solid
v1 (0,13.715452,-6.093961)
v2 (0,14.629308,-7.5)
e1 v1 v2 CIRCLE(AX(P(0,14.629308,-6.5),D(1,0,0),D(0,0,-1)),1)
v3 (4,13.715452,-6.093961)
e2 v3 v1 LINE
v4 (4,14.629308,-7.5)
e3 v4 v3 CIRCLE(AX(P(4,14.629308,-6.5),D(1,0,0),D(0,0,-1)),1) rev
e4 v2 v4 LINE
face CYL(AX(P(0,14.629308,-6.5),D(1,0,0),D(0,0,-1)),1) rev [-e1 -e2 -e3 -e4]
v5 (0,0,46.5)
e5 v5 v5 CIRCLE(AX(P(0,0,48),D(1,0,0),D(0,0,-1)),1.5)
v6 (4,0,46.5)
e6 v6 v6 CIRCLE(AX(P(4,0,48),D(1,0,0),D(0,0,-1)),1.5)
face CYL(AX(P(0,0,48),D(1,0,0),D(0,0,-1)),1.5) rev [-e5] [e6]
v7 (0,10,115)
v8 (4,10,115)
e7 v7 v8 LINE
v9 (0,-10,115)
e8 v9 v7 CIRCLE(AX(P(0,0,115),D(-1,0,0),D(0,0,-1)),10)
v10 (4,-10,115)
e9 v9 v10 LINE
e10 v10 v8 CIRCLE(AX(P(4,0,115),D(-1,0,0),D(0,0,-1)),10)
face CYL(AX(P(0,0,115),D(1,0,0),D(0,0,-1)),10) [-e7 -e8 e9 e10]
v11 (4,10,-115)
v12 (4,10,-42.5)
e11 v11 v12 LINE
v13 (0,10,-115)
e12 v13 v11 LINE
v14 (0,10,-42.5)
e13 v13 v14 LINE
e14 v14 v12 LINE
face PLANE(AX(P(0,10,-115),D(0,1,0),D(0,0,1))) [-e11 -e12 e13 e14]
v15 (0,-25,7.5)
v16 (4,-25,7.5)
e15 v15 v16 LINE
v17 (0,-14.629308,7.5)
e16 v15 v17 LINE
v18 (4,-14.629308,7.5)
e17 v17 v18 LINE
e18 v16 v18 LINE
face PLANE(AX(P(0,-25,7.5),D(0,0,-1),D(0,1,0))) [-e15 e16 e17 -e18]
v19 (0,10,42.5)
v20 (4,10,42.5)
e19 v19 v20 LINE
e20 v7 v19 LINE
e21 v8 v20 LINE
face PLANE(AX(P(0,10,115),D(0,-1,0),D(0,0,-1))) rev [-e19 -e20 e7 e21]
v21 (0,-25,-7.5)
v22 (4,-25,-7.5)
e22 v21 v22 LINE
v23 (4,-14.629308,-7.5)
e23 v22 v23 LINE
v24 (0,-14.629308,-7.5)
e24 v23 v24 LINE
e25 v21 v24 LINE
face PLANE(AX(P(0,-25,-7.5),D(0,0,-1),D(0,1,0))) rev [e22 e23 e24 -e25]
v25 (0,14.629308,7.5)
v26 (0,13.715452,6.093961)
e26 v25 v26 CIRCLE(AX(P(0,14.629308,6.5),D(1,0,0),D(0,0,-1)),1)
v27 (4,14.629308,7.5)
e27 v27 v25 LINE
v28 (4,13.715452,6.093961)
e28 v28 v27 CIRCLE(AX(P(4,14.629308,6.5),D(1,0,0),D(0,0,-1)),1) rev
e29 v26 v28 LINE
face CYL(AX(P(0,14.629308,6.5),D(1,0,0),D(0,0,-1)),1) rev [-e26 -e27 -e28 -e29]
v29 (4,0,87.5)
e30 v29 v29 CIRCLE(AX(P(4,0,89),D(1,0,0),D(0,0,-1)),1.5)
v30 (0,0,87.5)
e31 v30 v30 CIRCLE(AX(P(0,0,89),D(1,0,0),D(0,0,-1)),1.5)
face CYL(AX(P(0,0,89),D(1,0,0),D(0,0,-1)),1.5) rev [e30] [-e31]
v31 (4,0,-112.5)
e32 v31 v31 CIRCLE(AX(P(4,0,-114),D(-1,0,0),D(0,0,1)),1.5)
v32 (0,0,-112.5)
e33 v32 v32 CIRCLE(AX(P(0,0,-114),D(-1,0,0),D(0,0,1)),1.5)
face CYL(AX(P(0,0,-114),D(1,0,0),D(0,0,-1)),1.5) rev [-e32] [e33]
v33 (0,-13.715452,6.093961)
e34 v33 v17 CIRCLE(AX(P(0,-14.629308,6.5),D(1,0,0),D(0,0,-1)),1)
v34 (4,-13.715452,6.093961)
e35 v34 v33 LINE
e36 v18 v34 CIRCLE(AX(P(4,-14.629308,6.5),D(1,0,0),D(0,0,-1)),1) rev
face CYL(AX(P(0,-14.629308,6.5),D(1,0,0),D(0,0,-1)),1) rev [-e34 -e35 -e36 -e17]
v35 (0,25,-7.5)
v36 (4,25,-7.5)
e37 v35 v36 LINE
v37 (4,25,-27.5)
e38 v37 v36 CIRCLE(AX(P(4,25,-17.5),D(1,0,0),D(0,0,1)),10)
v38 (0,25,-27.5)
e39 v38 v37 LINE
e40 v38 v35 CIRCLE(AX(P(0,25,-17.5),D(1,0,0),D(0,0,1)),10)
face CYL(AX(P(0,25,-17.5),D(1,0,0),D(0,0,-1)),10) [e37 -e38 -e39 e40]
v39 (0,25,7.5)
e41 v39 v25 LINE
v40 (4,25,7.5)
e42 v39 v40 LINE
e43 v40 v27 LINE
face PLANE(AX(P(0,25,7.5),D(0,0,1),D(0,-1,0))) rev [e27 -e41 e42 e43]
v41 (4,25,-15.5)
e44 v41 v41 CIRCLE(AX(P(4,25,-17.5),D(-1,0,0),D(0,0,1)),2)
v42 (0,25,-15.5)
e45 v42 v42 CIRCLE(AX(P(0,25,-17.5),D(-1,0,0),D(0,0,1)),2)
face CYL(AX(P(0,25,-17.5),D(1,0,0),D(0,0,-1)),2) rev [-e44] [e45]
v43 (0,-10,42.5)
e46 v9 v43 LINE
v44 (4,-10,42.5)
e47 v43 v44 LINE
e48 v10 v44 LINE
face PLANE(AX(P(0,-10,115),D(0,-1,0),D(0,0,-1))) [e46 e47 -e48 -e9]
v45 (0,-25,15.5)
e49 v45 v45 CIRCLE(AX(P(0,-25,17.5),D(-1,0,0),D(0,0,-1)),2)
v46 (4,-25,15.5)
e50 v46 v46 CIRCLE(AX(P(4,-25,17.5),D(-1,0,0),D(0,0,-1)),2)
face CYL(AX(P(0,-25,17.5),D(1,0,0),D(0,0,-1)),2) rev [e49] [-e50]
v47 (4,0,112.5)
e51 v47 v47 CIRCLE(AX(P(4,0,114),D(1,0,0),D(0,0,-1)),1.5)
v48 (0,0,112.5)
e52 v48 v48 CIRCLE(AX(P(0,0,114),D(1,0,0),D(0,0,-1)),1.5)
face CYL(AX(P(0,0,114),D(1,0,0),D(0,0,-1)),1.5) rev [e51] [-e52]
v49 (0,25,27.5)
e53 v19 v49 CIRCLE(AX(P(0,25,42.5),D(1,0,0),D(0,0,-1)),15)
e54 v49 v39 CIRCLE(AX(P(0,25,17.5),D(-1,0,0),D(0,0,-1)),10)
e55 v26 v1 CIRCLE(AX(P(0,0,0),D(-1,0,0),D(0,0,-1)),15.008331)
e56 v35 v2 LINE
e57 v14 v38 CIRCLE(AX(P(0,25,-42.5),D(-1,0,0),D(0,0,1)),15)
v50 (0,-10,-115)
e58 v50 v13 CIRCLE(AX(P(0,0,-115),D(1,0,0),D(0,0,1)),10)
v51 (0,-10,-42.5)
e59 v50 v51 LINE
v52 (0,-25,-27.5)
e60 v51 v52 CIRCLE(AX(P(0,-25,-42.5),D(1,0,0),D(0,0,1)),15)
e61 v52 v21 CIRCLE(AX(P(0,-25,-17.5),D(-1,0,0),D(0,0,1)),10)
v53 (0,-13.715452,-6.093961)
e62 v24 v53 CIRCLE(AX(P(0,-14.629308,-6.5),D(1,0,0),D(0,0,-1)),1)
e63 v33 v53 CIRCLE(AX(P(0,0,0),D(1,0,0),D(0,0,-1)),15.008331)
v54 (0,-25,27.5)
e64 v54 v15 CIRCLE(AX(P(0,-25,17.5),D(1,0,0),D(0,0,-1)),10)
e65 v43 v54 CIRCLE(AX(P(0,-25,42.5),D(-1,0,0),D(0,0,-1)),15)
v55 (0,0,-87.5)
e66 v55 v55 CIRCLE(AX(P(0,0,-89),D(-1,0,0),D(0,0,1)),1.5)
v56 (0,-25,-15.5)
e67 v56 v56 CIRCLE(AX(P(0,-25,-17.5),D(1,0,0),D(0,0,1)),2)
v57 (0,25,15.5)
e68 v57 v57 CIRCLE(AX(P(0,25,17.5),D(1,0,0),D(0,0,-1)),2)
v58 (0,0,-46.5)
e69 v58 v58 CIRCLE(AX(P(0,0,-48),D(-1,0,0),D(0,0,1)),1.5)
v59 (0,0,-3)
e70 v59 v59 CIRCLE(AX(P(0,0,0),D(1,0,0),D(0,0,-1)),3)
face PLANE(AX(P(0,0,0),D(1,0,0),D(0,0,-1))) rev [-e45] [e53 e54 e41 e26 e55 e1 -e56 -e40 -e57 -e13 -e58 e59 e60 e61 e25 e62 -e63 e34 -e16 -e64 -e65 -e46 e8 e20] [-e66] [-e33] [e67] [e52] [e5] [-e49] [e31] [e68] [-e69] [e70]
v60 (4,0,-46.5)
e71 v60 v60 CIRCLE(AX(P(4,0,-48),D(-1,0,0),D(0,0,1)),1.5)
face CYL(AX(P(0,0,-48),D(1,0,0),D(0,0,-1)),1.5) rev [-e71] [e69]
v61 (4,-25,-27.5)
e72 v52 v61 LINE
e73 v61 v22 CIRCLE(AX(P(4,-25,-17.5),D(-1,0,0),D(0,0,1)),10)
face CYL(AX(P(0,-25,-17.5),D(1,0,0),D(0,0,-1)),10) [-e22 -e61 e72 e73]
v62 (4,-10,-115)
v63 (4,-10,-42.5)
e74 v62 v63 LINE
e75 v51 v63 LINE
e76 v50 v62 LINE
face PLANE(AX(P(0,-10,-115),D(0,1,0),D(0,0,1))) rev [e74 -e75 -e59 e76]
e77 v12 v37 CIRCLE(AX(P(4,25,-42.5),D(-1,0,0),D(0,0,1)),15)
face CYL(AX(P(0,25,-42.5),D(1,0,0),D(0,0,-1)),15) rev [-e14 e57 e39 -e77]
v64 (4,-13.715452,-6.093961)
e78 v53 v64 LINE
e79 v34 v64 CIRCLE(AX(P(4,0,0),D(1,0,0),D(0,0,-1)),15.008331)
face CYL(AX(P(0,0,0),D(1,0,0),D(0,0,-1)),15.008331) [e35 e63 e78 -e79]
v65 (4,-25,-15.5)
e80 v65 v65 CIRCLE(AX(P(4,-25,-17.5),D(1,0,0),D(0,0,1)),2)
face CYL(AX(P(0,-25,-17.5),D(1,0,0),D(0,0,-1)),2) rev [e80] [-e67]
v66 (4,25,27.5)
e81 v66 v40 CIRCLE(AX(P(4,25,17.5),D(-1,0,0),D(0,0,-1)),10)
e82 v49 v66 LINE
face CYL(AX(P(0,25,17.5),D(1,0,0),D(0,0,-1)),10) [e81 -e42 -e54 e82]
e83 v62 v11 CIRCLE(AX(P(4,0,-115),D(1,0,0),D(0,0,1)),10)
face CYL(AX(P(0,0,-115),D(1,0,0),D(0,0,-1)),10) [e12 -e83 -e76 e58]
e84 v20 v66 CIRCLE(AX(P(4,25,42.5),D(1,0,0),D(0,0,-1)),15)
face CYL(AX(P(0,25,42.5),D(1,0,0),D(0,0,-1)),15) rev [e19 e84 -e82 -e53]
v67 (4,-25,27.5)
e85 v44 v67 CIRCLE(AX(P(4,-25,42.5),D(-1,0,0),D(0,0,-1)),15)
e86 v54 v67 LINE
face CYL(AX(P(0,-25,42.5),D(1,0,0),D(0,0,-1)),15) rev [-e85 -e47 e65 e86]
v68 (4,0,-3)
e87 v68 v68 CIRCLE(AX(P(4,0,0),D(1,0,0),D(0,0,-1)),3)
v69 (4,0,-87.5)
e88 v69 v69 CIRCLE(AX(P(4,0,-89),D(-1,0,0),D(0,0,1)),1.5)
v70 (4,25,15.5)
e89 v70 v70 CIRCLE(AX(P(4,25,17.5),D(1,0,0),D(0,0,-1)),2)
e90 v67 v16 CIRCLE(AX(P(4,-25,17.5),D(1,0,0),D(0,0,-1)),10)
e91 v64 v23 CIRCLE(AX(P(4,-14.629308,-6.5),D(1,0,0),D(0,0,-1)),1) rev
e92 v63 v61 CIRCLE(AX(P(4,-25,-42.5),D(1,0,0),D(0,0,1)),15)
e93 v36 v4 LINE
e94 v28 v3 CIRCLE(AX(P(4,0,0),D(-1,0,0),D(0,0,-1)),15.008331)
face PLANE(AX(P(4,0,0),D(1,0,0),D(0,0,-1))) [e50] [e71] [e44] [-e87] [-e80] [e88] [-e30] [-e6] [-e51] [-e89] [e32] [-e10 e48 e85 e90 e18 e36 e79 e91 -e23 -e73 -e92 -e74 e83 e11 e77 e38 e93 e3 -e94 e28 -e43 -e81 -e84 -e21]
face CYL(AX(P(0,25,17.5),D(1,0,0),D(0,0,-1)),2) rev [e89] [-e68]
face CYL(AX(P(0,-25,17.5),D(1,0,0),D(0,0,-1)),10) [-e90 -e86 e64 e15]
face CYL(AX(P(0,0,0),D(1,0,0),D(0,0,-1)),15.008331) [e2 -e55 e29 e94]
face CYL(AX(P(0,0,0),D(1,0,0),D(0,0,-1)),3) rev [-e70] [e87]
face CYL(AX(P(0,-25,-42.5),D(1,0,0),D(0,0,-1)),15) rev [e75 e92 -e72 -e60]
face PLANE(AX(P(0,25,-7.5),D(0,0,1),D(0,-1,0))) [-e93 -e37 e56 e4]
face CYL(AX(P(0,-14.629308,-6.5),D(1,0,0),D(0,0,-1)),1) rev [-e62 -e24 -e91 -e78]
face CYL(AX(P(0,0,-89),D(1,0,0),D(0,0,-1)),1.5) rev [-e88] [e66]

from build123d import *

# Parameters (mm, degrees)
SKETCH1_W            = 250
SKETCH1_H            = 75
BOSS_EXTRUDE1_DEPTH  = 4
SKETCH2_R            = 3
SKETCH2_R_2          = 1.5
CUT_EXTRUDE1_DEPTH   = 131.565117853
SKETCH3_R            = 2
CUT_EXTRUDE2_DEPTH   = 131.565117853
CUT_EXTRUDE3_DEPTH   = 131.565117853
FILLET1_R            = 1
FILLET1_OF_MIRROR2_R = 1
MIRROR3_OUTLINE_R    = 1.5
MIRROR3_OUTLINE_R_2  = 2
MIRROR3_DEPTH        = 4


# Read off the part's stored shape, not the designer's step: Mirror3
with BuildPart() as part:
    # Sketch1 → Boss-Extrude1 (new body)
    with BuildSketch(Plane(origin=(0, 0, 0), x_dir=(0, 0, -1), z_dir=(1, 0, 0))):
        Rectangle(SKETCH1_W, SKETCH1_H)
    extrude(amount=BOSS_EXTRUDE1_DEPTH)

    # Sketch2 → Cut-Extrude1 (cut, through all)
    with BuildSketch(Plane(origin=(4, 0, 0), x_dir=(0, 0, -1), z_dir=(1, 0, 0))):
        Circle(SKETCH2_R)
        with Locations((-48, 0)):
            Circle(SKETCH2_R_2)
        with Locations((-89, 0)):
            Circle(SKETCH2_R_2)
        with Locations((-114, 0)):
            Circle(SKETCH2_R_2)
    extrude(amount=-CUT_EXTRUDE1_DEPTH, mode=Mode.SUBTRACT)

    # Sketch3 → Cut-Extrude2 (cut, through all)
    with BuildSketch(Plane(origin=(4, 0, 0), x_dir=(0, 0, -1), z_dir=(1, 0, 0))):
        with Locations((-17.5, 25)):
            Circle(SKETCH3_R)
    cut_extrude2 = extrude(amount=-CUT_EXTRUDE2_DEPTH, mode=Mode.SUBTRACT)

    # Sketch4 → Cut-Extrude3 (cut, through all)
    with BuildSketch(Plane(origin=(4, 0, 0), x_dir=(0, 0, -1), z_dir=(1, 0, 0))):
        with BuildLine():
            Line((-115, 10), (-42.5, 10))
            ThreePointArc((-42.5, 10), (-31.893398282, 14.393398282), (-27.5, 25))
            ThreePointArc((-27.5, 25), (-17.5, 35), (-7.5, 25))
            Line((-7.5, 25), (-7.5, 13))
            ThreePointArc((-7.5, 13), (-3.882119057, 14.497556747), (0, 15.00833102))
            Line((0, 15.00833102), (0, 37.5))
            Line((0, 37.5), (-125, 37.5))
            Line((-125, 37.5), (-125, 0))
            ThreePointArc((-125, 0), (-122.071067812, 7.071067812), (-115, 10))
        make_face()
    cut_extrude3 = extrude(amount=-CUT_EXTRUDE3_DEPTH, mode=Mode.SUBTRACT)

    # Fillet1
    fillet1_edges = [part.edges().sort_by_distance(p)[0] for p in [
        (2, 13, 7.5),
    ]]
    fillet(fillet1_edges, radius=FILLET1_R)

    # Mirror2: Cut-Extrude2, Cut-Extrude3 across plane
    add(cut_extrude2.mirror(Plane.ZX), mode=Mode.SUBTRACT)
    add(cut_extrude3.mirror(Plane.ZX), mode=Mode.SUBTRACT)

    # Fillet1 of Mirror2
    fillet1_of_mirror2_edges = [part.edges().sort_by_distance(p)[0] for p in [
        (2, -13, 7.5),
    ]]
    fillet(fillet1_of_mirror2_edges, radius=FILLET1_OF_MIRROR2_R)

    # Mirror3 outline → Mirror3 (cut)
    with BuildSketch(Plane.YZ):
        with BuildLine():
            Line((-37.5, -125), (-3.5e-08, -125))
            ThreePointArc((-3.5e-08, -125), (-7.071067824, -122.071067799), (-10, -115))
            Line((-10, -115), (-10, -42.5))
            ThreePointArc((-10, -42.5), (-14.393398282, -31.893398282), (-25, -27.5))
            ThreePointArc((-25, -27.5), (-35, -17.5), (-25, -7.5))
            Line((-25, -7.5), (-14.629308324, -7.5))
            ThreePointArc((-14.629308324, -7.5), (-13.790845868, -7.044959365), (-13.715452388, -6.09396142))
            ThreePointArc((-13.715452388, -6.09396142), (-14.681553895, -3.114799389), (-15.00833102, 0))
            Line((-15.00833102, 0), (-37.5, 0))
            Line((-37.5, 0), (-37.5, -125))
        make_face()
        with BuildLine():
            ThreePointArc((15.00833102, 0), (14.681553895, -3.114799389), (13.715452388, -6.09396142))
            ThreePointArc((13.715452388, -6.09396142), (13.790845868, -7.044959365), (14.629308324, -7.5))
            Line((14.629308324, -7.5), (25, -7.5))
            ThreePointArc((25, -7.5), (35, -17.5), (25, -27.5))
            ThreePointArc((25, -27.5), (14.393398282, -31.893398282), (10, -42.5))
            Line((10, -42.5), (10, -115))
            ThreePointArc((10, -115), (7.071067799, -122.071067824), (-3.5e-08, -125))
            Line((-3.5e-08, -125), (37.5, -125))
            Line((37.5, -125), (37.5, 0))
            Line((37.5, 0), (15.00833102, 0))
        make_face()
        with Locations((0, -114)):
            Circle(MIRROR3_OUTLINE_R)
        with Locations((0, -89)):
            Circle(MIRROR3_OUTLINE_R)
        with Locations((0, -48)):
            Circle(MIRROR3_OUTLINE_R)
        with Locations((25, -17.5)):
            Circle(MIRROR3_OUTLINE_R_2)
        with Locations((-25, -17.5)):
            Circle(MIRROR3_OUTLINE_R_2)
    extrude(amount=MIRROR3_DEPTH, mode=Mode.SUBTRACT)


solid = part.part
